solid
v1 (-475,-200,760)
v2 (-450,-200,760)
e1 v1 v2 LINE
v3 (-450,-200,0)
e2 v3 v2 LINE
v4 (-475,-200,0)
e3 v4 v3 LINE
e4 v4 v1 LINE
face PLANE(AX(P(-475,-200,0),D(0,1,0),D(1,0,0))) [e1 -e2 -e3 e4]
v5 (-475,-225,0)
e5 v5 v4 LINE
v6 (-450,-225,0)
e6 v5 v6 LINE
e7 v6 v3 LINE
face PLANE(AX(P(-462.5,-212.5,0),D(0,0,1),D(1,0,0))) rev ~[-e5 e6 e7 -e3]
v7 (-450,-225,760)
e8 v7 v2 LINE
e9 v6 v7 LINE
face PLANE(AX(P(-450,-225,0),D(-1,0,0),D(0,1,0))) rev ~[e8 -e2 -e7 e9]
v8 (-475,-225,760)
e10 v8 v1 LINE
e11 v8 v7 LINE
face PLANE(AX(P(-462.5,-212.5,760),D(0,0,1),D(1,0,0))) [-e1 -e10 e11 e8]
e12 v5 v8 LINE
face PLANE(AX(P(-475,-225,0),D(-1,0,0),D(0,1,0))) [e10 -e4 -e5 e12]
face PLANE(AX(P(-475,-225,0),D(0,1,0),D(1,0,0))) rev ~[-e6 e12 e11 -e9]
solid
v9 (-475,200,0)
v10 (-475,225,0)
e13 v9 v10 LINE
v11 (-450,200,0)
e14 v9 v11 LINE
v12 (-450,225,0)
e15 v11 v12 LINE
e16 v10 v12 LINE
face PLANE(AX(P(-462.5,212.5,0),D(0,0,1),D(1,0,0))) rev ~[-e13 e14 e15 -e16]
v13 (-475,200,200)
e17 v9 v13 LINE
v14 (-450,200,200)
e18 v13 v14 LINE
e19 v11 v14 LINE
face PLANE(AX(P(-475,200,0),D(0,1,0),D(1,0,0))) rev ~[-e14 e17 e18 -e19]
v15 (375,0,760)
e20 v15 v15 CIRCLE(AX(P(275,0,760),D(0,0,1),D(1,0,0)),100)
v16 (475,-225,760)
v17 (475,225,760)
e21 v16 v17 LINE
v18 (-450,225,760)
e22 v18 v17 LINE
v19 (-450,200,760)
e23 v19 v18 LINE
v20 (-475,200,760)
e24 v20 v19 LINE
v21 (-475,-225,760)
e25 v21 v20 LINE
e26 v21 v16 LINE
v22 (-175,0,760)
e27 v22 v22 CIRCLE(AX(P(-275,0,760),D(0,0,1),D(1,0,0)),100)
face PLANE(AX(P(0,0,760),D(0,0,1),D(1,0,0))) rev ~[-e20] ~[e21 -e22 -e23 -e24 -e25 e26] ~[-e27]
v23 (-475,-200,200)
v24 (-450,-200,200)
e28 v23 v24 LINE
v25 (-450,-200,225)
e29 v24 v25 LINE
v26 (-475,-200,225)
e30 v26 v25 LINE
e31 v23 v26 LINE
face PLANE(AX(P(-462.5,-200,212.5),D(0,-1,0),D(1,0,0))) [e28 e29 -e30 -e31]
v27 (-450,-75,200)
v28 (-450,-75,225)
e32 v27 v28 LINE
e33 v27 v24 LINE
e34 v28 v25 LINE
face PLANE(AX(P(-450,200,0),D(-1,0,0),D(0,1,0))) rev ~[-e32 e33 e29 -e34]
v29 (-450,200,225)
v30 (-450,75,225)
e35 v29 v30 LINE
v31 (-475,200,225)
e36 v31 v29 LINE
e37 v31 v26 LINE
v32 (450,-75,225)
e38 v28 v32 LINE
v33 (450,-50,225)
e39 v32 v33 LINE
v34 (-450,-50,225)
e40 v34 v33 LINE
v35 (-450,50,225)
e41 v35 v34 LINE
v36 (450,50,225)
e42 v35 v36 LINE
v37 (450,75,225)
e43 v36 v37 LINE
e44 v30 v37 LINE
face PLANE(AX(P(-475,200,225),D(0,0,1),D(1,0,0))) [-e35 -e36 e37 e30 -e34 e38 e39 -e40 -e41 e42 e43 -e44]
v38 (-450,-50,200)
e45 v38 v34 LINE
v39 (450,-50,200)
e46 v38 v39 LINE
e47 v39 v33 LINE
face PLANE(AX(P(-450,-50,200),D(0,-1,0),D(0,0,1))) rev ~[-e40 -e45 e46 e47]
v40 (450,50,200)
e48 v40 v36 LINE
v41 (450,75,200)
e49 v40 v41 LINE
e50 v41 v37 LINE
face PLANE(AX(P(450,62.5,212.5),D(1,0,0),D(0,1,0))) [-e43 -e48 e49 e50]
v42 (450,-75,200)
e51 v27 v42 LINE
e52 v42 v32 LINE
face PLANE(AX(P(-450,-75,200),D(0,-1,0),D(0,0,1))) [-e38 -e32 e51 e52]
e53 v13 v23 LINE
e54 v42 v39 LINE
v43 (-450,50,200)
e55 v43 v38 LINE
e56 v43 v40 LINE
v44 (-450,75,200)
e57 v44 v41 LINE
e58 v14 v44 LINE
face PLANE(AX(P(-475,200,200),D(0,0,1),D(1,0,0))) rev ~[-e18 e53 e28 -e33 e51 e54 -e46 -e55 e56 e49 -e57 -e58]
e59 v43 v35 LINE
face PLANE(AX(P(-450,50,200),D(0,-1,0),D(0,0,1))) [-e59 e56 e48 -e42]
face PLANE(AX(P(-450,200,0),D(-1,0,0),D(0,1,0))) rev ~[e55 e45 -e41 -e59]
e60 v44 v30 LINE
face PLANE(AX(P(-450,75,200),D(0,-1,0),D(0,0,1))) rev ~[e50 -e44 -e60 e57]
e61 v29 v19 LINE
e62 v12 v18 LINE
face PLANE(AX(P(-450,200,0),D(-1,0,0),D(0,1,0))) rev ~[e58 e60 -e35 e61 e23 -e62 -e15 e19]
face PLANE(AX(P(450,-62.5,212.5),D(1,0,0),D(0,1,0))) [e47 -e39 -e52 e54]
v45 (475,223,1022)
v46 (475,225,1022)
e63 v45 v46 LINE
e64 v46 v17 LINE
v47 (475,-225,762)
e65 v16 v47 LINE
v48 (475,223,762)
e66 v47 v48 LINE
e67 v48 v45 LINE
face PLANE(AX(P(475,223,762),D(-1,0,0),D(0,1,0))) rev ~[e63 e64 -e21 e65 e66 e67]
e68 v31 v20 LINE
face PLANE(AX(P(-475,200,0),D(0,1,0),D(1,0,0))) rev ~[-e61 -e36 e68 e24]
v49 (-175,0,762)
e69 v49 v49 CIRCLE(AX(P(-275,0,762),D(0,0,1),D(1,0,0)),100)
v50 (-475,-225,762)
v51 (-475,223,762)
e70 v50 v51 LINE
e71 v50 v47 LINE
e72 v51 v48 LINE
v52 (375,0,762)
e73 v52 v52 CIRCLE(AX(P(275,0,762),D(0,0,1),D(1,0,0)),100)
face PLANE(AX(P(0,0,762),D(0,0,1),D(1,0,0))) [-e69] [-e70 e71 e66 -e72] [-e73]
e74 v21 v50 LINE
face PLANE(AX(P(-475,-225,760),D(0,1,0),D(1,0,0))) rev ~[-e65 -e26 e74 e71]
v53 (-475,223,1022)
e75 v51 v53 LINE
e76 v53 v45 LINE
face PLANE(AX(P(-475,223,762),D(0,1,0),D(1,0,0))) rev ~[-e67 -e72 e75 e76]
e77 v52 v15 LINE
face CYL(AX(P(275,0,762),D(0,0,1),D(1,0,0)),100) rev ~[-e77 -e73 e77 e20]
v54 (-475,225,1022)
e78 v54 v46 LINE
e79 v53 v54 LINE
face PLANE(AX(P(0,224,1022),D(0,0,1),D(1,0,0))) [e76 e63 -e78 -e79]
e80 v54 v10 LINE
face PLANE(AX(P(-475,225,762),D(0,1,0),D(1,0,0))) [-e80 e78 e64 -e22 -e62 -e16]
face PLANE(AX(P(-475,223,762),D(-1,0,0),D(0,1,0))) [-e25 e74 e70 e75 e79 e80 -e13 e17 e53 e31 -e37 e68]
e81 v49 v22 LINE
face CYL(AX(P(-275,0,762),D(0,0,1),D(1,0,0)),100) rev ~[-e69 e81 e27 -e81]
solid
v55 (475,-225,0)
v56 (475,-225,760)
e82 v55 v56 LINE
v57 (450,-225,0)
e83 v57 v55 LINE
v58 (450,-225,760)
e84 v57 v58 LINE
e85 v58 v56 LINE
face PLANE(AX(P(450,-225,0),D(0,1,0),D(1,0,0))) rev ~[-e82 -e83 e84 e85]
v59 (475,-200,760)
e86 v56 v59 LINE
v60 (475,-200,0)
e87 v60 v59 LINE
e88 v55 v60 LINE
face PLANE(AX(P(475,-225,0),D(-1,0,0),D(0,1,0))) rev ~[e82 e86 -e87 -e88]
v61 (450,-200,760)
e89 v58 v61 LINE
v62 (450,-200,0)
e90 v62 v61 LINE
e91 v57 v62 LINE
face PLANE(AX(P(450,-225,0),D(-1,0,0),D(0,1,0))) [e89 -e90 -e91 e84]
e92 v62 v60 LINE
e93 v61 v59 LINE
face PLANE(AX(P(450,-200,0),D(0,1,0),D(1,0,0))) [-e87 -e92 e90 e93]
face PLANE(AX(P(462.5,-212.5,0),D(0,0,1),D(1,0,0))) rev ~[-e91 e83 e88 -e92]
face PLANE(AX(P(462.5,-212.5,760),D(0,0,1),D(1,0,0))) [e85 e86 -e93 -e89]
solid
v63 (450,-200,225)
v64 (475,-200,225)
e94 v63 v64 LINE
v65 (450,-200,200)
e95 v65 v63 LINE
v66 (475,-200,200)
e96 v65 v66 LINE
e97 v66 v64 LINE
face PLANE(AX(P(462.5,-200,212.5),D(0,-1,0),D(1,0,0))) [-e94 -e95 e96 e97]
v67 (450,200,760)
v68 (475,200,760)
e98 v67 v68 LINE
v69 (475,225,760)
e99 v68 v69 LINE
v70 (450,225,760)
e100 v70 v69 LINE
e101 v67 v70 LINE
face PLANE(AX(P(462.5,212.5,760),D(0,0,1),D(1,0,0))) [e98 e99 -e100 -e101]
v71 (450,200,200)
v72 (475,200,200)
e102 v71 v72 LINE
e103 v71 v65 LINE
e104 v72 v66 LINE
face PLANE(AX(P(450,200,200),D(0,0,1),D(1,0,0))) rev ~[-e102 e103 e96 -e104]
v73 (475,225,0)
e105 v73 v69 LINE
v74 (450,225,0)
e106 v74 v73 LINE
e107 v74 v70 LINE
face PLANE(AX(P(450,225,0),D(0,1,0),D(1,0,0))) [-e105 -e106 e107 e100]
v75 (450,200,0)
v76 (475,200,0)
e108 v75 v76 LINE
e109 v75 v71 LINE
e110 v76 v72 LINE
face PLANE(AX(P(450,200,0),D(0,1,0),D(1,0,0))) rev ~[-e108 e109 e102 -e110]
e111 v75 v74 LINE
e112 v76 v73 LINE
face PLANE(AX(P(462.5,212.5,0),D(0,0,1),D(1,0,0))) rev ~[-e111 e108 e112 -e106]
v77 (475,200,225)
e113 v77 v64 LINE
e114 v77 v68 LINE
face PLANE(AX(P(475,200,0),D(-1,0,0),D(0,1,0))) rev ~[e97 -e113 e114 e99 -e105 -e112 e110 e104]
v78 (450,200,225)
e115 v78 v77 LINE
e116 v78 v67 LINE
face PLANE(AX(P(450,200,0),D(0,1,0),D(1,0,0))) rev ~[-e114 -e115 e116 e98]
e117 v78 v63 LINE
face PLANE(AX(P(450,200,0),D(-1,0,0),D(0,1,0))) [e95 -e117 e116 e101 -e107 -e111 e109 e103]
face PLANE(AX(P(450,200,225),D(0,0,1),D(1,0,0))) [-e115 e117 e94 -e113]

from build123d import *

# Parameters (mm, degrees)
F0_W      = 25
F0_H      = 25
F1_DEPTH  = 760
F2_DEPTH  = 760
F3_W      = 950
F3_H      = 450
F4_DEPTH  = 2
F5_W      = 950
F5_H      = 2
F6_DEPTH  = 260
F7_W      = 25
F7_H      = 25
F8_DEPTH  = 400
F9_W      = 25
F9_H      = 25
F10_DEPTH = 900
F11_R     = 100
F12_DEPTH = 2


with BuildPart() as f1:
    # F0 (on Top) → F1 (new body)
    with BuildSketch(Plane.XY):
        with Locations((-462.5, 212.5)):
            Rectangle(F0_W, F0_H)
    extrude(amount=F1_DEPTH)

    # F3 (on face) → F4 (join)
    with BuildSketch(Plane.XY.offset(760)):
        Rectangle(F3_W, F3_H)
    extrude(amount=F4_DEPTH)

    # F5 (on face) → F6 (join)
    with BuildSketch(Plane.XY.offset(762)):
        with Locations((0, 224)):
            Rectangle(F5_W, F5_H)
    extrude(amount=F6_DEPTH)

    # F7 (on face) → F8 (join, through all)
    with BuildSketch(Plane.XZ.offset(-200)):
        with Locations((-462.5, 212.5)):
            Rectangle(F7_W, F7_H)
    extrude(amount=F8_DEPTH)

    # F9 (on face) → F10 (join)
    with BuildSketch(Plane.YZ.offset(-450)):
        with Locations((62.5, 212.5)):
            Rectangle(F9_W, F9_H)
        with Locations((-62.5, 212.5)):
            Rectangle(F9_W, F9_H)
    extrude(amount=F10_DEPTH)

    # F11 (on face) → F12 (cut, through all)
    with BuildSketch(Plane.XY.offset(762)):
        with Locations((-275, 0)):
            Circle(F11_R)
        with Locations((275, 0)):
            Circle(F11_R)
    extrude(amount=-F12_DEPTH, mode=Mode.SUBTRACT)


with BuildPart() as f2:
    # F0 (on Top) → F2 (new body)
    with BuildSketch(Plane.XY):
        with Locations((462.5, -212.5)):
            Rectangle(F0_W, F0_H)
    extrude(amount=F2_DEPTH)


with BuildPart() as f2b:
    # F0 (on Top) → F2, piece 2 (new body)
    with BuildSketch(Plane.XY):
        with Locations((462.5, 212.5)):
            Rectangle(F0_W, F0_H)
    extrude(amount=F2_DEPTH)

    # F7 (on face) → F8, piece 2 (join, through all)
    with BuildSketch(Plane.XZ.offset(-200)):
        with Locations((462.5, 212.5)):
            Rectangle(F7_W, F7_H)
    extrude(amount=F8_DEPTH)


with BuildPart() as f2c:
    # F0 (on Top) → F2, piece 3 (new body)
    with BuildSketch(Plane.XY):
        with Locations((-462.5, -212.5)):
            Rectangle(F0_W, F0_H)
    extrude(amount=F2_DEPTH)


solid = Compound([f1.part, f2.part, f2b.part, f2c.part])
